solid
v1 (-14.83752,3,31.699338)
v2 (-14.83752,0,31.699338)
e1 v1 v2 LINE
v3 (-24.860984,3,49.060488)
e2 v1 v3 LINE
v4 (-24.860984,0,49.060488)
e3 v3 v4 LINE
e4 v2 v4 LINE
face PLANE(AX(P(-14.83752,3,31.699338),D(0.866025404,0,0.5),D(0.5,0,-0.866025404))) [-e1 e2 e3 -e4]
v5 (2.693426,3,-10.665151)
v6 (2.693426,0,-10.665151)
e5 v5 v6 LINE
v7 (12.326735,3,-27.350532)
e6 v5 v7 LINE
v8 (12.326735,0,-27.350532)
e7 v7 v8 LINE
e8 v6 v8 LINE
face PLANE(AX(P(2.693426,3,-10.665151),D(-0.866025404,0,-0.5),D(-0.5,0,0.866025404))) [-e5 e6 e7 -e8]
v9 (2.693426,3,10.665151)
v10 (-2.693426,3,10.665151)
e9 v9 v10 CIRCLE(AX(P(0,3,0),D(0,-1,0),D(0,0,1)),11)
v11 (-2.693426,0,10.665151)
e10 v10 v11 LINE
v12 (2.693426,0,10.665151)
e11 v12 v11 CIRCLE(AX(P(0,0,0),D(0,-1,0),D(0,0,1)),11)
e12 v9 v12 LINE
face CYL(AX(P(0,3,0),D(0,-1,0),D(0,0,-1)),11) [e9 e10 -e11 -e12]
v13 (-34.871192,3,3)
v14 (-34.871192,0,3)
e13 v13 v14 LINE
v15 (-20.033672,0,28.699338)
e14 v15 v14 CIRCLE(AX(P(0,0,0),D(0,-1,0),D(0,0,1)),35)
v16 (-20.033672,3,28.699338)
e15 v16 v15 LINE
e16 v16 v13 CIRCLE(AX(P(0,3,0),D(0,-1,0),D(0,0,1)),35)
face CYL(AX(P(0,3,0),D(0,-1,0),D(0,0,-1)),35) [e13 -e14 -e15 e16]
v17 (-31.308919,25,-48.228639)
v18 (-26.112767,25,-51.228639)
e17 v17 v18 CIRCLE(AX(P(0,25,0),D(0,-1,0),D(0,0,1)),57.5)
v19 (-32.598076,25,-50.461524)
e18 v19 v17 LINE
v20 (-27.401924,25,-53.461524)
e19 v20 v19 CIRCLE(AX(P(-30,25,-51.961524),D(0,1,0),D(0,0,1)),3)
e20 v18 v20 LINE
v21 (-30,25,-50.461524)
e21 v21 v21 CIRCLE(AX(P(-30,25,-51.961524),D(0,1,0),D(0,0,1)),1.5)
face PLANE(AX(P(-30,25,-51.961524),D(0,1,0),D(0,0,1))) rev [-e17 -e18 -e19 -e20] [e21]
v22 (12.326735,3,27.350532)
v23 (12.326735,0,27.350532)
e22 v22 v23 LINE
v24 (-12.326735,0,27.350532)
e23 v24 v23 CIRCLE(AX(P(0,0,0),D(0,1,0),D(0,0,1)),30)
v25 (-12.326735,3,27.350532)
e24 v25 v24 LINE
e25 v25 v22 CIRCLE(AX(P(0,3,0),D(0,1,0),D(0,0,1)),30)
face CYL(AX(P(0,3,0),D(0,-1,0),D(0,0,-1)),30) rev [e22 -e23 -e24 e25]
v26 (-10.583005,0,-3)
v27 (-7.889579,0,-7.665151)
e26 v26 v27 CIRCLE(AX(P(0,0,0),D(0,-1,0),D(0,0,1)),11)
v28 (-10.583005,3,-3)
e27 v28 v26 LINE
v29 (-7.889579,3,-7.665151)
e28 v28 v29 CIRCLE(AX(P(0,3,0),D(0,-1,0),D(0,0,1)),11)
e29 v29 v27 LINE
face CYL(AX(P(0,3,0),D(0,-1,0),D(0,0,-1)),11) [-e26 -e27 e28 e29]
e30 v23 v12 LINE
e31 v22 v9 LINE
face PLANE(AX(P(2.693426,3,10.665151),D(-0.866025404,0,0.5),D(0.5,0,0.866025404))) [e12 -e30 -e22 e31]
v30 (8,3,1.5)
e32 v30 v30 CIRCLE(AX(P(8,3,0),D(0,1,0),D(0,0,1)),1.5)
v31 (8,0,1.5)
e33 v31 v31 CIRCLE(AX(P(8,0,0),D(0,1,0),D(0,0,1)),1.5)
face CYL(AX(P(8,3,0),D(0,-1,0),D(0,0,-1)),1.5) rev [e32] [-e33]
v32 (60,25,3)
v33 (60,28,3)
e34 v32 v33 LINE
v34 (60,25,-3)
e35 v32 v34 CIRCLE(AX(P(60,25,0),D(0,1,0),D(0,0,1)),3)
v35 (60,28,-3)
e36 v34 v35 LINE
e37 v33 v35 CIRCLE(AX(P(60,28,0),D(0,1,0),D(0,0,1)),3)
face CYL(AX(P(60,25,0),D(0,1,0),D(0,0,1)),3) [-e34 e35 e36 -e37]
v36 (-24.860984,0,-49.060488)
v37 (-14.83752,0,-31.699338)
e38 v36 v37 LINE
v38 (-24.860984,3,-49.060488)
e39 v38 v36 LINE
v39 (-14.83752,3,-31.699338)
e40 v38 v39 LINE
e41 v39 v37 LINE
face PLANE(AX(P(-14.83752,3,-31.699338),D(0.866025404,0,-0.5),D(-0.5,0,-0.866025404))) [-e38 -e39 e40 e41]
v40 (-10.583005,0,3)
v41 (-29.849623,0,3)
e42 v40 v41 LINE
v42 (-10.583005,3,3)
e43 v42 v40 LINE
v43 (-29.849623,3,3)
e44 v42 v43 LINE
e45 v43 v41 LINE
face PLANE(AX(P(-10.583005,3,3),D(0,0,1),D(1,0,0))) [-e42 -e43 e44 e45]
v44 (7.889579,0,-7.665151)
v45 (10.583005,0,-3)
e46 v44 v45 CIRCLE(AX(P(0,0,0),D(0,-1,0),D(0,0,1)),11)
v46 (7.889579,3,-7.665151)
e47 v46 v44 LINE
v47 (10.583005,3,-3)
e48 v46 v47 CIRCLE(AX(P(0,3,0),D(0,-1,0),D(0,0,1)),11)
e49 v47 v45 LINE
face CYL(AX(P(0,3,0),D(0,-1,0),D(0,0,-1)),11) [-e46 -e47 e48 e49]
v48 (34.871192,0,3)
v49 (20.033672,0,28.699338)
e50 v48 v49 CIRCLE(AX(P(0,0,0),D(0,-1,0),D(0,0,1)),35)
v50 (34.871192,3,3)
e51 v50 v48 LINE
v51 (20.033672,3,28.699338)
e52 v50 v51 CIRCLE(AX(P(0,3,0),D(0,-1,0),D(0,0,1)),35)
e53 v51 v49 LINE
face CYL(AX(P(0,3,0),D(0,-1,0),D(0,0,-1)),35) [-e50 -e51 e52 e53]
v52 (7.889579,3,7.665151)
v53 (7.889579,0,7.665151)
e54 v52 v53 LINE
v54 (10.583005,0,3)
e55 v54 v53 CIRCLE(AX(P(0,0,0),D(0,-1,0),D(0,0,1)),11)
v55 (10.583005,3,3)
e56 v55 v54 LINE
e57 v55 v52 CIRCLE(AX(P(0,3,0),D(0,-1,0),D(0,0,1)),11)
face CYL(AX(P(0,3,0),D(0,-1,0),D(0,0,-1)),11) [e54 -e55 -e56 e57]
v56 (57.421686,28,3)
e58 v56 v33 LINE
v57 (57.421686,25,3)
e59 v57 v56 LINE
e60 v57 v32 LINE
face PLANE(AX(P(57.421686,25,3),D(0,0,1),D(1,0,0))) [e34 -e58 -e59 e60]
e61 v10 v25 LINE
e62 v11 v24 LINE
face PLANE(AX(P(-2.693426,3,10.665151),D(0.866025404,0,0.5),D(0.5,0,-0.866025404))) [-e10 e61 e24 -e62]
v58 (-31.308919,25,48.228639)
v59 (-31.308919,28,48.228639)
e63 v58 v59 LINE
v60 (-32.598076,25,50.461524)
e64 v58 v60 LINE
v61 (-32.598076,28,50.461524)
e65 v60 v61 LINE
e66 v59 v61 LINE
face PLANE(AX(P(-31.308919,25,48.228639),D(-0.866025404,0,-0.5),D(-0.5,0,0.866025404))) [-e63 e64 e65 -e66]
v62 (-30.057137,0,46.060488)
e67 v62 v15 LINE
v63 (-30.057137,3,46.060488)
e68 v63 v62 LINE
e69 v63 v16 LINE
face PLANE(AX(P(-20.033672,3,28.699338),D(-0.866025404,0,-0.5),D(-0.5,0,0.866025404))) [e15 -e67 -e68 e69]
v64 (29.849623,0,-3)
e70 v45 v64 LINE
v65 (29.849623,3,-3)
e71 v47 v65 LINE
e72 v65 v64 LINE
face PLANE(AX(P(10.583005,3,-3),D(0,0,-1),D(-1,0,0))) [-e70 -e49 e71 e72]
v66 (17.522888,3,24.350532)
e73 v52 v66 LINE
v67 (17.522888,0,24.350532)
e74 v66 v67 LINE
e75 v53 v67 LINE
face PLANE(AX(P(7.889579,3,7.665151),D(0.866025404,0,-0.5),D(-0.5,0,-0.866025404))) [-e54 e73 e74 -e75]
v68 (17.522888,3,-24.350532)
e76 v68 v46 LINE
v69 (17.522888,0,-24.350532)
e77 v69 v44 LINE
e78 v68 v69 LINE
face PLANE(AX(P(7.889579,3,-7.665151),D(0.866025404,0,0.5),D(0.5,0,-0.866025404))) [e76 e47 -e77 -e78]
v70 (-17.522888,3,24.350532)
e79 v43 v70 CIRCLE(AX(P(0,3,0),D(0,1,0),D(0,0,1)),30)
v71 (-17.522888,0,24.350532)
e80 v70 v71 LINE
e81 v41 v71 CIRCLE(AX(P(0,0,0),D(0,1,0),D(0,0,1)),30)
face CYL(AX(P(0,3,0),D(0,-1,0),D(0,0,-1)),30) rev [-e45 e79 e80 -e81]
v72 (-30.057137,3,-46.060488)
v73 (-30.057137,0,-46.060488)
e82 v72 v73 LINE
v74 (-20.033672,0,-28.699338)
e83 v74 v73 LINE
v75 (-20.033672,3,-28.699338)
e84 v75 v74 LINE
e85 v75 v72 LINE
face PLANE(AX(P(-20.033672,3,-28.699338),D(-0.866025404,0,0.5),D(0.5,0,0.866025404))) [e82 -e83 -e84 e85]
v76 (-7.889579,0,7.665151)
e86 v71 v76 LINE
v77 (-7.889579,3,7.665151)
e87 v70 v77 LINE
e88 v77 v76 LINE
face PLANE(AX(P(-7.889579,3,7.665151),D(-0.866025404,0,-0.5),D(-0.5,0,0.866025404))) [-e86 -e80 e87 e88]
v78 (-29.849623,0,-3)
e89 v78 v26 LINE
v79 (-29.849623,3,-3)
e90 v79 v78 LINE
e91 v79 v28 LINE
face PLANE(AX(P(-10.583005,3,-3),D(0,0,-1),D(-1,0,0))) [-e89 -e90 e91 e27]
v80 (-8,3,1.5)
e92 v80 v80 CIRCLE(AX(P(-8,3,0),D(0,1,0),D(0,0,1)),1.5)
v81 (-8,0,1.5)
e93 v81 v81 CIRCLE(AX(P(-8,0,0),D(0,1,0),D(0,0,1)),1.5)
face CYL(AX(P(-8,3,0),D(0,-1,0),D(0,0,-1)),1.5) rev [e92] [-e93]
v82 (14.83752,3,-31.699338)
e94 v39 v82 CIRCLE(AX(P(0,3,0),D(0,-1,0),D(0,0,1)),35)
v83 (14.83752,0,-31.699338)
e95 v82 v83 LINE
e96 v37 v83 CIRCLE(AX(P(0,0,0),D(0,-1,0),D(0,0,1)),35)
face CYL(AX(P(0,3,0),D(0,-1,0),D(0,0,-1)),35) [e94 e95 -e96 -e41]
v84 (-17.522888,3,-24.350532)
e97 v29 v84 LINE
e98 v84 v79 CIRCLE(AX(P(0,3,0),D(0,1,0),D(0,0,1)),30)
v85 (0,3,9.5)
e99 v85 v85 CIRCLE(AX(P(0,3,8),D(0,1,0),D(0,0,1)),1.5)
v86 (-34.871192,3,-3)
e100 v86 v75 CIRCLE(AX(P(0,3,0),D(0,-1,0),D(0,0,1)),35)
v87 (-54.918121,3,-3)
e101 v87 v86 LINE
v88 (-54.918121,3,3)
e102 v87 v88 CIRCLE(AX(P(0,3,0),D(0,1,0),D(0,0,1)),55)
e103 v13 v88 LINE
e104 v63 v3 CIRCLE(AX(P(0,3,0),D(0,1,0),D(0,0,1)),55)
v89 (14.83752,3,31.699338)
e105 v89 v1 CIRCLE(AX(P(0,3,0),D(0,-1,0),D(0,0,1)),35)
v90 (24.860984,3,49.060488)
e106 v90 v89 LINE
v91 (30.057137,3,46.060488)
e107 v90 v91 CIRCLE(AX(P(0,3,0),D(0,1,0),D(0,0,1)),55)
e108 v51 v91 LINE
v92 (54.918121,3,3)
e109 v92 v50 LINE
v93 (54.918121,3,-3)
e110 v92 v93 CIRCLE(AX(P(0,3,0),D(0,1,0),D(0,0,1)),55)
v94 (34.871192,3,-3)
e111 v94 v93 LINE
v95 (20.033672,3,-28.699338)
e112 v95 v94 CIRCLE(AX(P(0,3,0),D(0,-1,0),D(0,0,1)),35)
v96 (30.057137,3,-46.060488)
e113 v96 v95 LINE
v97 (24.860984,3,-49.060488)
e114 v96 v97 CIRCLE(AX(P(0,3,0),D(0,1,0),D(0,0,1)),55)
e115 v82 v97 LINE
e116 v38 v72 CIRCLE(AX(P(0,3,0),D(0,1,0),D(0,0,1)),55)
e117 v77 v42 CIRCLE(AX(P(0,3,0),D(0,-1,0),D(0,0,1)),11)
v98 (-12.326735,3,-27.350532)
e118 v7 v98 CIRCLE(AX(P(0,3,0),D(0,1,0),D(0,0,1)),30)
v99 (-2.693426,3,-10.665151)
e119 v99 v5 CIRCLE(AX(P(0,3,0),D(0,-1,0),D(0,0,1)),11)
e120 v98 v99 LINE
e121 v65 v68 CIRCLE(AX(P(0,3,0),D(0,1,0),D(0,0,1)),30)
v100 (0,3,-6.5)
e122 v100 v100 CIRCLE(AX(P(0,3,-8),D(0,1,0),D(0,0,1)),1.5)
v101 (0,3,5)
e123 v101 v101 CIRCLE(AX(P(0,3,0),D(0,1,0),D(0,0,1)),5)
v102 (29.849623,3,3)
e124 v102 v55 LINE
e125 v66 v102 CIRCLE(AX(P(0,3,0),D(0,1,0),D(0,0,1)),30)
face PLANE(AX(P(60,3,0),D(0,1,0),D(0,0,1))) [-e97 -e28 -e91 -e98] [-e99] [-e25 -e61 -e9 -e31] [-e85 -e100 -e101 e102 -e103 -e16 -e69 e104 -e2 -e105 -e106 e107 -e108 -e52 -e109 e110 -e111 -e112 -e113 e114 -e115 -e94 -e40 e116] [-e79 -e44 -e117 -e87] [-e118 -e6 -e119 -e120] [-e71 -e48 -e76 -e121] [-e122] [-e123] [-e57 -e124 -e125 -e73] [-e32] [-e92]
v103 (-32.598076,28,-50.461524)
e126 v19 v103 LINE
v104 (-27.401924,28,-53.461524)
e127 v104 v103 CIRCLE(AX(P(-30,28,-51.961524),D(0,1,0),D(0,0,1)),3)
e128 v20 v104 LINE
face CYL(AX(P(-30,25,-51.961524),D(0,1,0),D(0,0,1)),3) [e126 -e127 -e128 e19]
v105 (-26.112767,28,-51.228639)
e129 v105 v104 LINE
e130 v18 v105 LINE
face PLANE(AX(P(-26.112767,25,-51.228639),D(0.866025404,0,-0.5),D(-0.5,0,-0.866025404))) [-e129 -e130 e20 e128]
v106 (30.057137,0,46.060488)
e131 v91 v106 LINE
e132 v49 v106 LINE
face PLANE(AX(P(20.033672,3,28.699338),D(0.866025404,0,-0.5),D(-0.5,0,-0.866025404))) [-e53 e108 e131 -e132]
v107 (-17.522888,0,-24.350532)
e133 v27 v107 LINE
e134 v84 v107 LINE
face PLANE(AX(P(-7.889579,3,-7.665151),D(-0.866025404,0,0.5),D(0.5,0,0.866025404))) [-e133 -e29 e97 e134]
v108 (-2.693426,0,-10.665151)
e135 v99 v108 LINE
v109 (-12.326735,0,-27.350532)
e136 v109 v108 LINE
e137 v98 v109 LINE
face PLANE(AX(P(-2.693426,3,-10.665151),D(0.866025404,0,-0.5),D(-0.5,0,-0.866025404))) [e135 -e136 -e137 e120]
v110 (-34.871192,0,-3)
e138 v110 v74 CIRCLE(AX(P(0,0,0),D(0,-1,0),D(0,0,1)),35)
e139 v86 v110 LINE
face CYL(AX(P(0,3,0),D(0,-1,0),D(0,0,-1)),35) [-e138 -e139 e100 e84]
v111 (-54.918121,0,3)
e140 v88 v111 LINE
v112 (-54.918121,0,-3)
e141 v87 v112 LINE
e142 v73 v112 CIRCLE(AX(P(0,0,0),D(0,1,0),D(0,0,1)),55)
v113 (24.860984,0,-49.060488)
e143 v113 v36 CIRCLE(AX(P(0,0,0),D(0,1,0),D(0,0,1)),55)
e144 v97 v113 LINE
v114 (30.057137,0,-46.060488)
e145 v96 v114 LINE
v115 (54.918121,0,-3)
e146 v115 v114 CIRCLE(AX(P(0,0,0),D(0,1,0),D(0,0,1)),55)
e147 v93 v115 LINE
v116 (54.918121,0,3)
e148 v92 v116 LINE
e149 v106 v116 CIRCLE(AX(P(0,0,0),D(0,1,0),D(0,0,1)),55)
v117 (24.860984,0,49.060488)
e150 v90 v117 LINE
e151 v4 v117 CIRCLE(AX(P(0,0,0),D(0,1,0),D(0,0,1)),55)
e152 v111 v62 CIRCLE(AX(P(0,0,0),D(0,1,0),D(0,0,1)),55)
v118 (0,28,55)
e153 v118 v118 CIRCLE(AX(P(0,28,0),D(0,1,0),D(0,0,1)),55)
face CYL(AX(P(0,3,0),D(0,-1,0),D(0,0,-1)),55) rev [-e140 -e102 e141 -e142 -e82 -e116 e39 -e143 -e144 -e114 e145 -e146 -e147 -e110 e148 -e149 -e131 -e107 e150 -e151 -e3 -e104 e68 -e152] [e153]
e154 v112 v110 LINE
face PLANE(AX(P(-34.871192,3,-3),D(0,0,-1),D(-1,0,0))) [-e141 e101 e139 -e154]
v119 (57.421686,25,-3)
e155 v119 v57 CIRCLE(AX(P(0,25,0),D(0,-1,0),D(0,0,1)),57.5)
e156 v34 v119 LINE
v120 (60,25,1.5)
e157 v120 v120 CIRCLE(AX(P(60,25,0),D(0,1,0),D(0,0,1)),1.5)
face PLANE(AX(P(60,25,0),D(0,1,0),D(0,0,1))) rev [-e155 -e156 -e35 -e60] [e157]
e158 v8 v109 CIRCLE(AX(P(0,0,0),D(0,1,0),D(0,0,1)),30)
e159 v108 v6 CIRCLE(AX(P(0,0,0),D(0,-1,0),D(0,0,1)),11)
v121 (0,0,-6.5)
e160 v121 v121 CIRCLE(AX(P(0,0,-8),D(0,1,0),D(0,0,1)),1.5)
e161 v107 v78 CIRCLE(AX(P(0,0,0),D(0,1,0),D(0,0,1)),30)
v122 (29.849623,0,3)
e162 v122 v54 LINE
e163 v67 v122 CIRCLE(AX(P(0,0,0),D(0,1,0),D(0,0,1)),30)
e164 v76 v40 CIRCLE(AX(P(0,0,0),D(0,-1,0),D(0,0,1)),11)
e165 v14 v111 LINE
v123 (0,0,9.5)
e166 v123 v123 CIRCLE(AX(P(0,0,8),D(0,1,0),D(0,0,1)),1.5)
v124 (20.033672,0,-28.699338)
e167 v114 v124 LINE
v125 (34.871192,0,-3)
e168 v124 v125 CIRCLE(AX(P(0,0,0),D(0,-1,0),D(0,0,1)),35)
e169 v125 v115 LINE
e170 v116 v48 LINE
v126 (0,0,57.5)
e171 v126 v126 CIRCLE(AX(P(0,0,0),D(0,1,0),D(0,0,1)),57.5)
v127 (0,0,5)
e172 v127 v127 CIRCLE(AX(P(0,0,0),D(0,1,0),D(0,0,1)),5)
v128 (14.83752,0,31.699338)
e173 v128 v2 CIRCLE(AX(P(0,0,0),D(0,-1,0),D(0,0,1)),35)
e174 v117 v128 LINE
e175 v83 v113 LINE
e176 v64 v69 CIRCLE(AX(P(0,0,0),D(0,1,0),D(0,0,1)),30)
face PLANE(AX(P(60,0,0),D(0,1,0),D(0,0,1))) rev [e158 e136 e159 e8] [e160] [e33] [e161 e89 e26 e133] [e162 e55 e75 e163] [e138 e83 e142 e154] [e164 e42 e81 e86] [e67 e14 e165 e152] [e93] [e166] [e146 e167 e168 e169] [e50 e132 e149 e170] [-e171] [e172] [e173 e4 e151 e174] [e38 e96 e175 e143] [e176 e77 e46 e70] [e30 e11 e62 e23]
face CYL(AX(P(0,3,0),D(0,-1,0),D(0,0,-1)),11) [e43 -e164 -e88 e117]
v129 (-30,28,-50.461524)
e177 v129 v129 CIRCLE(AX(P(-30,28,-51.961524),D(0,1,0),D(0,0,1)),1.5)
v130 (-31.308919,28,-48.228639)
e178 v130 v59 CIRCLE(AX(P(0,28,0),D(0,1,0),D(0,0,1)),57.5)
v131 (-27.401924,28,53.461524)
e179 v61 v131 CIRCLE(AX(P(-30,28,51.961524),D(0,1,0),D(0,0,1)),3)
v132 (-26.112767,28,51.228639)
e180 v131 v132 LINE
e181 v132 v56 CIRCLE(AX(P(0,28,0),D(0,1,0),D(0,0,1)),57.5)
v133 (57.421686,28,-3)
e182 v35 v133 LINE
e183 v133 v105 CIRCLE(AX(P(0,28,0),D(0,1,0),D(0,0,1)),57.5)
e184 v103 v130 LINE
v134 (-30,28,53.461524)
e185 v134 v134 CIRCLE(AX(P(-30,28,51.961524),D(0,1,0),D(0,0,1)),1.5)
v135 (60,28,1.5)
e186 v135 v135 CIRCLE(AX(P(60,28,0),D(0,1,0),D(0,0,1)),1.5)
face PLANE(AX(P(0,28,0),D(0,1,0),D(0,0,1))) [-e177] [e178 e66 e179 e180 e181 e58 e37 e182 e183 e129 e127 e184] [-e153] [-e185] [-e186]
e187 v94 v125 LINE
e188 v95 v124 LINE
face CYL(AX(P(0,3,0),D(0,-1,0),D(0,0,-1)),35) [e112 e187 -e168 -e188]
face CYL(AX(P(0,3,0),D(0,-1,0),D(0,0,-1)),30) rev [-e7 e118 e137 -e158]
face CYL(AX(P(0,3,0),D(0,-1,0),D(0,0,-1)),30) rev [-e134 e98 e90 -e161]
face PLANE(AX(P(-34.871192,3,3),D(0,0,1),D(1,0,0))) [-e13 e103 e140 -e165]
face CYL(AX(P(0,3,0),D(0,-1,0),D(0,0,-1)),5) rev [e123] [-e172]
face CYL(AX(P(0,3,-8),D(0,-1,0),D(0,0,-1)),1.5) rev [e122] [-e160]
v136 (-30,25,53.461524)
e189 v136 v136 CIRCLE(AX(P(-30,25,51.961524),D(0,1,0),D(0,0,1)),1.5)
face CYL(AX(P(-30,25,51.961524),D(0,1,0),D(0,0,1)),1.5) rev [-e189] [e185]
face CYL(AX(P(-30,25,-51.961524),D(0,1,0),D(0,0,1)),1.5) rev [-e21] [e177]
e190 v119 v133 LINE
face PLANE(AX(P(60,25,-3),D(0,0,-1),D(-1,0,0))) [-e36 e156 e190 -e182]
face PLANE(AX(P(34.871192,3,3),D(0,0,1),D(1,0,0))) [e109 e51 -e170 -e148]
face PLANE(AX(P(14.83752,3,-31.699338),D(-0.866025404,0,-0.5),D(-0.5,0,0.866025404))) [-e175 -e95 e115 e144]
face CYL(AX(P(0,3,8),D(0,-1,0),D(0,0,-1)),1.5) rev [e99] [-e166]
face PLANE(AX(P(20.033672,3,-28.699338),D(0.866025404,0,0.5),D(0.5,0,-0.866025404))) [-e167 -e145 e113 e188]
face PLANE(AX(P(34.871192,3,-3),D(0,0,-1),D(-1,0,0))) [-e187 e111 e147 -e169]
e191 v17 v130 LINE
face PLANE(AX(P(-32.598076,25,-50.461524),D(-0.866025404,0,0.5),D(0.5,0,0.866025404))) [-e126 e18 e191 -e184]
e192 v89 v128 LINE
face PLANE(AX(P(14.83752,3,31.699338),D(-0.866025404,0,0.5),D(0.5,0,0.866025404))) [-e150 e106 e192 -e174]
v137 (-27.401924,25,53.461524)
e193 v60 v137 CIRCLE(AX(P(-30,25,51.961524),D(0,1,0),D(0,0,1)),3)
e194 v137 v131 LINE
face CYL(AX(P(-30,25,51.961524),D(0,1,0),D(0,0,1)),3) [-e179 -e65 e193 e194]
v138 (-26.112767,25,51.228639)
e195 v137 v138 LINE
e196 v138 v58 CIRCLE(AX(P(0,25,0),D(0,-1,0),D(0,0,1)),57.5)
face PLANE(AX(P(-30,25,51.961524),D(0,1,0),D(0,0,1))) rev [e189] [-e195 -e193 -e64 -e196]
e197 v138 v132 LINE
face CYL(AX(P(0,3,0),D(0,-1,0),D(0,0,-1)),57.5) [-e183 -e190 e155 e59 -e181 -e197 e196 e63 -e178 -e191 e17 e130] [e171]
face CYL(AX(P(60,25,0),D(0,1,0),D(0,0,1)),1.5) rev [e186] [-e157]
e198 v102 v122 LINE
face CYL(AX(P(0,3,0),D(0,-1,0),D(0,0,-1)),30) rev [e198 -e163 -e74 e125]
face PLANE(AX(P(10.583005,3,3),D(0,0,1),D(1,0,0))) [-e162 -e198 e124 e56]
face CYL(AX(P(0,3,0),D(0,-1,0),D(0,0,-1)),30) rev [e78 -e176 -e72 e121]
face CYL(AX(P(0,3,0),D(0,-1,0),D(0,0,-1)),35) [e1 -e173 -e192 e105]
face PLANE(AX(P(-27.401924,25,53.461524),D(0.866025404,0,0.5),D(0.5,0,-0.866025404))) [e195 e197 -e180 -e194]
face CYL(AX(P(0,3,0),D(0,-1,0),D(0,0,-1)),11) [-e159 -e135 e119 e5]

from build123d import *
from build123d.topology import SkipClean

# Parameters (mm, degrees)
SKETCH_1_R          = 1.5
SKETCH_1_R_2        = 5
EXTRUDE_1_DEPTH     = 3
SKETCH_2_R          = 57.5
SKETCH_2_R_2        = 55
EXTRUDE_2_DEPTH     = 25
EXTRUDE_START       = -3
SKETCH_3_R          = 1.5
EXTRUDE_3_DEPTH     = 3
CUT_EXTRUDE_START   = -30
SKETCH_4_R          = 69.475087651
SKETCH_4_R_2        = 57.5
CUT_EXTRUDE_1_DEPTH = 30


with BuildPart() as part:
    # 草图1 → 凸台-拉伸1 (new body)
    with BuildSketch(Plane(origin=(0, 0, 0), x_dir=(1, 0, 0), z_dir=(0, 1, 0))):
        with BuildLine():
            Line((57.421685799, 3), (60, 3))
            ThreePointArc((60, 3), (63, 0), (60, -3))
            Line((60, -3), (57.421685799, -3))
            ThreePointArc((57.421685799, -3), (28.75, -49.796460718), (-26.112766688, -51.22863863))
            Line((-26.112766688, -51.22863863), (-27.401923789, -53.461524227))
            ThreePointArc((-27.401923789, -53.461524227), (-31.5, -54.559600438), (-32.598076211, -50.461524227))
            Line((-32.598076211, -50.461524227), (-31.308919111, -48.22863863))
            ThreePointArc((-31.308919111, -48.22863863), (-57.5, 0), (-31.308919111, 48.22863863))
            Line((-31.308919111, 48.22863863), (-32.598076211, 50.461524227))
            ThreePointArc((-32.598076211, 50.461524227), (-31.5, 54.559600438), (-27.401923789, 53.461524227))
            Line((-27.401923789, 53.461524227), (-26.112766688, 51.22863863))
            ThreePointArc((-26.112766688, 51.22863863), (28.75, 49.796460718), (57.421685799, 3))
        make_face()
        with Locations((0, 8)):
            Circle(SKETCH_1_R, mode=Mode.SUBTRACT)
        with Locations((8, 0)):
            Circle(SKETCH_1_R, mode=Mode.SUBTRACT)
        with Locations((0, -8)):
            Circle(SKETCH_1_R, mode=Mode.SUBTRACT)
        with Locations((-8, 0)):
            Circle(SKETCH_1_R, mode=Mode.SUBTRACT)
        Circle(SKETCH_1_R_2, mode=Mode.SUBTRACT)
        with Locations((60, 0)):
            Circle(SKETCH_1_R, mode=Mode.SUBTRACT)
        with Locations((-30, -51.961524227)):
            Circle(SKETCH_1_R, mode=Mode.SUBTRACT)
        with Locations((-30, 51.961524227)):
            Circle(SKETCH_1_R, mode=Mode.SUBTRACT)
        with BuildLine():
            Line((10.583005244, 3), (29.849623113, 3))
            ThreePointArc((29.849623113, 3), (25.980762114, 15), (17.522887768, 24.350531909))
            Line((17.522887768, 24.350531909), (7.889578833, 7.66515139))
            ThreePointArc((7.889578833, 7.66515139), (9.526279442, 5.5), (10.583005244, 3))
        make_face(mode=Mode.SUBTRACT)
        with BuildLine():
            Line((10.583005244, -3), (29.849623113, -3))
            ThreePointArc((29.849623113, -3), (25.980762114, -15), (17.522887768, -24.350531909))
            Line((17.522887768, -24.350531909), (7.889578833, -7.66515139))
            ThreePointArc((7.889578833, -7.66515139), (9.526279442, -5.5), (10.583005244, -3))
        make_face(mode=Mode.SUBTRACT)
        with BuildLine():
            Line((2.693426411, -10.66515139), (12.326735345, -27.350531909))
            ThreePointArc((12.326735345, -27.350531909), (0, -30), (-12.326735345, -27.350531909))
            Line((-12.326735345, -27.350531909), (-2.693426411, -10.66515139))
            ThreePointArc((-2.693426411, -10.66515139), (0, -11), (2.693426411, -10.66515139))
        make_face(mode=Mode.SUBTRACT)
        with BuildLine():
            Line((-14.837519563, 31.699337741), (-24.860984224, 49.060487802))
            ThreePointArc((-24.860984224, 49.060487802), (0, 55), (24.860984224, 49.060487802))
            Line((24.860984224, 49.060487802), (14.837519563, 31.699337741))
            ThreePointArc((14.837519563, 31.699337741), (0, 35), (-14.837519563, 31.699337741))
        make_face(mode=Mode.SUBTRACT)
        with BuildLine():
            Line((-7.889578833, -7.66515139), (-17.522887768, -24.350531909))
            ThreePointArc((-17.522887768, -24.350531909), (-25.980762114, -15), (-29.849623113, -3))
            Line((-29.849623113, -3), (-10.583005244, -3))
            ThreePointArc((-10.583005244, -3), (-9.526279442, -5.5), (-7.889578833, -7.66515139))
        make_face(mode=Mode.SUBTRACT)
        with BuildLine():
            Line((-10.583005244, 3), (-29.849623113, 3))
            ThreePointArc((-29.849623113, 3), (-25.980762114, 15), (-17.522887768, 24.350531909))
            Line((-17.522887768, 24.350531909), (-7.889578833, 7.66515139))
            ThreePointArc((-7.889578833, 7.66515139), (-9.526279442, 5.5), (-10.583005244, 3))
        make_face(mode=Mode.SUBTRACT)
        with BuildLine():
            Line((20.033671986, 28.699337741), (30.057136647, 46.060487802))
            ThreePointArc((30.057136647, 46.060487802), (47.631397208, 27.5), (54.918120871, 3))
            Line((54.918120871, 3), (34.871191548, 3))
            ThreePointArc((34.871191548, 3), (30.310889132, 17.5), (20.033671986, 28.699337741))
        make_face(mode=Mode.SUBTRACT)
        with BuildLine():
            Line((-20.033671986, 28.699337741), (-30.057136647, 46.060487802))
            ThreePointArc((-30.057136647, 46.060487802), (-47.631397208, 27.5), (-54.918120871, 3))
            Line((-54.918120871, 3), (-34.871191548, 3))
            ThreePointArc((-34.871191548, 3), (-30.310889132, 17.5), (-20.033671986, 28.699337741))
        make_face(mode=Mode.SUBTRACT)
        with BuildLine():
            Line((-2.693426411, 10.66515139), (-12.326735345, 27.350531909))
            ThreePointArc((-12.326735345, 27.350531909), (0, 30), (12.326735345, 27.350531909))
            Line((12.326735345, 27.350531909), (2.693426411, 10.66515139))
            ThreePointArc((2.693426411, 10.66515139), (0, 11), (-2.693426411, 10.66515139))
        make_face(mode=Mode.SUBTRACT)
        with BuildLine():
            Line((-34.871191548, -3), (-54.918120871, -3))
            ThreePointArc((-54.918120871, -3), (-47.631397208, -27.5), (-30.057136647, -46.060487802))
            Line((-30.057136647, -46.060487802), (-20.033671986, -28.699337741))
            ThreePointArc((-20.033671986, -28.699337741), (-30.310889132, -17.5), (-34.871191548, -3))
        make_face(mode=Mode.SUBTRACT)
        with BuildLine():
            Line((34.871191548, -3), (54.918120871, -3))
            ThreePointArc((54.918120871, -3), (47.631397208, -27.5), (30.057136647, -46.060487802))
            Line((30.057136647, -46.060487802), (20.033671986, -28.699337741))
            ThreePointArc((20.033671986, -28.699337741), (30.310889132, -17.5), (34.871191548, -3))
        make_face(mode=Mode.SUBTRACT)
        with BuildLine():
            Line((14.837519563, -31.699337741), (24.860984224, -49.060487802))
            ThreePointArc((24.860984224, -49.060487802), (0, -55), (-24.860984224, -49.060487802))
            Line((-24.860984224, -49.060487802), (-14.837519563, -31.699337741))
            ThreePointArc((-14.837519563, -31.699337741), (0, -35), (14.837519563, -31.699337741))
        make_face(mode=Mode.SUBTRACT)
    extrude(amount=EXTRUDE_1_DEPTH)

    # 草图2 → 凸台-拉伸2 (add)
    with SkipClean():  # the faces are left unmerged after this step: merging them gives an invalid solid
        with BuildSketch(Plane(origin=(0, 3, 0), x_dir=(1, 0, 0), z_dir=(0, 1, 0))):
            Circle(SKETCH_2_R)
            Circle(SKETCH_2_R_2, mode=Mode.SUBTRACT)
        extrude(amount=EXTRUDE_2_DEPTH)
    add(part.part.scale(1), mode=Mode.REPLACE)  # the faces are merged on a copy

    # 草图3 → 凸台-拉伸3 (add)
    # profile 1 of 3: a face of its own
    with SkipClean():  # the faces are left unmerged after this step: merging them gives an invalid solid
        with BuildSketch(Plane(origin=(0, 28, 0), x_dir=(1, 0, 0), z_dir=(0, 1, 0)).offset(EXTRUDE_START)):
            with BuildLine():
                Line((-32.598076211, 50.461524227), (-31.308919111, 48.22863863))
                ThreePointArc((-31.308919111, 48.22863863), (-28.75, 49.796460718), (-26.112766688, 51.22863863))
                Line((-26.112766688, 51.22863863), (-27.401923789, 53.461524227))
                ThreePointArc((-27.401923789, 53.461524227), (-31.5, 54.559600438), (-32.598076211, 50.461524227))
            make_face()
            with Locations((-30, 51.961524227)):
                Circle(SKETCH_3_R, mode=Mode.SUBTRACT)
        # profile 2 of 3: a face of its own
        with BuildSketch(Plane(origin=(0, 28, 0), x_dir=(1, 0, 0), z_dir=(0, 1, 0)).offset(EXTRUDE_START)):
            with BuildLine():
                Line((60, 3), (57.421685799, 3))
                ThreePointArc((57.421685799, 3), (57.5, 0), (57.421685799, -3))
                Line((57.421685799, -3), (60, -3))
                ThreePointArc((60, -3), (63, 0), (60, 3))
            make_face()
            with Locations((60, 0)):
                Circle(SKETCH_3_R, mode=Mode.SUBTRACT)
        # profile 3 of 3: a face of its own
        with BuildSketch(Plane(origin=(0, 28, 0), x_dir=(1, 0, 0), z_dir=(0, 1, 0)).offset(EXTRUDE_START)):
            with BuildLine():
                Line((-27.401923789, -53.461524227), (-26.112766688, -51.22863863))
                ThreePointArc((-26.112766688, -51.22863863), (-28.75, -49.796460718), (-31.308919111, -48.22863863))
                Line((-31.308919111, -48.22863863), (-32.598076211, -50.461524227))
                ThreePointArc((-32.598076211, -50.461524227), (-31.5, -54.559600438), (-27.401923789, -53.461524227))
            make_face()
            with Locations((-30, -51.961524227)):
                Circle(SKETCH_3_R, mode=Mode.SUBTRACT)
        extrude(amount=EXTRUDE_3_DEPTH)

    # 草图4 → 切除-拉伸1 (cut)
    with BuildSketch(Plane(origin=(0, 3, 0), x_dir=(1, 0, 0), z_dir=(0, 1, 0)).offset(CUT_EXTRUDE_START)):
        Circle(SKETCH_4_R)
        Circle(SKETCH_4_R_2, mode=Mode.SUBTRACT)
    extrude(amount=CUT_EXTRUDE_1_DEPTH, mode=Mode.SUBTRACT)


solid = part.part
